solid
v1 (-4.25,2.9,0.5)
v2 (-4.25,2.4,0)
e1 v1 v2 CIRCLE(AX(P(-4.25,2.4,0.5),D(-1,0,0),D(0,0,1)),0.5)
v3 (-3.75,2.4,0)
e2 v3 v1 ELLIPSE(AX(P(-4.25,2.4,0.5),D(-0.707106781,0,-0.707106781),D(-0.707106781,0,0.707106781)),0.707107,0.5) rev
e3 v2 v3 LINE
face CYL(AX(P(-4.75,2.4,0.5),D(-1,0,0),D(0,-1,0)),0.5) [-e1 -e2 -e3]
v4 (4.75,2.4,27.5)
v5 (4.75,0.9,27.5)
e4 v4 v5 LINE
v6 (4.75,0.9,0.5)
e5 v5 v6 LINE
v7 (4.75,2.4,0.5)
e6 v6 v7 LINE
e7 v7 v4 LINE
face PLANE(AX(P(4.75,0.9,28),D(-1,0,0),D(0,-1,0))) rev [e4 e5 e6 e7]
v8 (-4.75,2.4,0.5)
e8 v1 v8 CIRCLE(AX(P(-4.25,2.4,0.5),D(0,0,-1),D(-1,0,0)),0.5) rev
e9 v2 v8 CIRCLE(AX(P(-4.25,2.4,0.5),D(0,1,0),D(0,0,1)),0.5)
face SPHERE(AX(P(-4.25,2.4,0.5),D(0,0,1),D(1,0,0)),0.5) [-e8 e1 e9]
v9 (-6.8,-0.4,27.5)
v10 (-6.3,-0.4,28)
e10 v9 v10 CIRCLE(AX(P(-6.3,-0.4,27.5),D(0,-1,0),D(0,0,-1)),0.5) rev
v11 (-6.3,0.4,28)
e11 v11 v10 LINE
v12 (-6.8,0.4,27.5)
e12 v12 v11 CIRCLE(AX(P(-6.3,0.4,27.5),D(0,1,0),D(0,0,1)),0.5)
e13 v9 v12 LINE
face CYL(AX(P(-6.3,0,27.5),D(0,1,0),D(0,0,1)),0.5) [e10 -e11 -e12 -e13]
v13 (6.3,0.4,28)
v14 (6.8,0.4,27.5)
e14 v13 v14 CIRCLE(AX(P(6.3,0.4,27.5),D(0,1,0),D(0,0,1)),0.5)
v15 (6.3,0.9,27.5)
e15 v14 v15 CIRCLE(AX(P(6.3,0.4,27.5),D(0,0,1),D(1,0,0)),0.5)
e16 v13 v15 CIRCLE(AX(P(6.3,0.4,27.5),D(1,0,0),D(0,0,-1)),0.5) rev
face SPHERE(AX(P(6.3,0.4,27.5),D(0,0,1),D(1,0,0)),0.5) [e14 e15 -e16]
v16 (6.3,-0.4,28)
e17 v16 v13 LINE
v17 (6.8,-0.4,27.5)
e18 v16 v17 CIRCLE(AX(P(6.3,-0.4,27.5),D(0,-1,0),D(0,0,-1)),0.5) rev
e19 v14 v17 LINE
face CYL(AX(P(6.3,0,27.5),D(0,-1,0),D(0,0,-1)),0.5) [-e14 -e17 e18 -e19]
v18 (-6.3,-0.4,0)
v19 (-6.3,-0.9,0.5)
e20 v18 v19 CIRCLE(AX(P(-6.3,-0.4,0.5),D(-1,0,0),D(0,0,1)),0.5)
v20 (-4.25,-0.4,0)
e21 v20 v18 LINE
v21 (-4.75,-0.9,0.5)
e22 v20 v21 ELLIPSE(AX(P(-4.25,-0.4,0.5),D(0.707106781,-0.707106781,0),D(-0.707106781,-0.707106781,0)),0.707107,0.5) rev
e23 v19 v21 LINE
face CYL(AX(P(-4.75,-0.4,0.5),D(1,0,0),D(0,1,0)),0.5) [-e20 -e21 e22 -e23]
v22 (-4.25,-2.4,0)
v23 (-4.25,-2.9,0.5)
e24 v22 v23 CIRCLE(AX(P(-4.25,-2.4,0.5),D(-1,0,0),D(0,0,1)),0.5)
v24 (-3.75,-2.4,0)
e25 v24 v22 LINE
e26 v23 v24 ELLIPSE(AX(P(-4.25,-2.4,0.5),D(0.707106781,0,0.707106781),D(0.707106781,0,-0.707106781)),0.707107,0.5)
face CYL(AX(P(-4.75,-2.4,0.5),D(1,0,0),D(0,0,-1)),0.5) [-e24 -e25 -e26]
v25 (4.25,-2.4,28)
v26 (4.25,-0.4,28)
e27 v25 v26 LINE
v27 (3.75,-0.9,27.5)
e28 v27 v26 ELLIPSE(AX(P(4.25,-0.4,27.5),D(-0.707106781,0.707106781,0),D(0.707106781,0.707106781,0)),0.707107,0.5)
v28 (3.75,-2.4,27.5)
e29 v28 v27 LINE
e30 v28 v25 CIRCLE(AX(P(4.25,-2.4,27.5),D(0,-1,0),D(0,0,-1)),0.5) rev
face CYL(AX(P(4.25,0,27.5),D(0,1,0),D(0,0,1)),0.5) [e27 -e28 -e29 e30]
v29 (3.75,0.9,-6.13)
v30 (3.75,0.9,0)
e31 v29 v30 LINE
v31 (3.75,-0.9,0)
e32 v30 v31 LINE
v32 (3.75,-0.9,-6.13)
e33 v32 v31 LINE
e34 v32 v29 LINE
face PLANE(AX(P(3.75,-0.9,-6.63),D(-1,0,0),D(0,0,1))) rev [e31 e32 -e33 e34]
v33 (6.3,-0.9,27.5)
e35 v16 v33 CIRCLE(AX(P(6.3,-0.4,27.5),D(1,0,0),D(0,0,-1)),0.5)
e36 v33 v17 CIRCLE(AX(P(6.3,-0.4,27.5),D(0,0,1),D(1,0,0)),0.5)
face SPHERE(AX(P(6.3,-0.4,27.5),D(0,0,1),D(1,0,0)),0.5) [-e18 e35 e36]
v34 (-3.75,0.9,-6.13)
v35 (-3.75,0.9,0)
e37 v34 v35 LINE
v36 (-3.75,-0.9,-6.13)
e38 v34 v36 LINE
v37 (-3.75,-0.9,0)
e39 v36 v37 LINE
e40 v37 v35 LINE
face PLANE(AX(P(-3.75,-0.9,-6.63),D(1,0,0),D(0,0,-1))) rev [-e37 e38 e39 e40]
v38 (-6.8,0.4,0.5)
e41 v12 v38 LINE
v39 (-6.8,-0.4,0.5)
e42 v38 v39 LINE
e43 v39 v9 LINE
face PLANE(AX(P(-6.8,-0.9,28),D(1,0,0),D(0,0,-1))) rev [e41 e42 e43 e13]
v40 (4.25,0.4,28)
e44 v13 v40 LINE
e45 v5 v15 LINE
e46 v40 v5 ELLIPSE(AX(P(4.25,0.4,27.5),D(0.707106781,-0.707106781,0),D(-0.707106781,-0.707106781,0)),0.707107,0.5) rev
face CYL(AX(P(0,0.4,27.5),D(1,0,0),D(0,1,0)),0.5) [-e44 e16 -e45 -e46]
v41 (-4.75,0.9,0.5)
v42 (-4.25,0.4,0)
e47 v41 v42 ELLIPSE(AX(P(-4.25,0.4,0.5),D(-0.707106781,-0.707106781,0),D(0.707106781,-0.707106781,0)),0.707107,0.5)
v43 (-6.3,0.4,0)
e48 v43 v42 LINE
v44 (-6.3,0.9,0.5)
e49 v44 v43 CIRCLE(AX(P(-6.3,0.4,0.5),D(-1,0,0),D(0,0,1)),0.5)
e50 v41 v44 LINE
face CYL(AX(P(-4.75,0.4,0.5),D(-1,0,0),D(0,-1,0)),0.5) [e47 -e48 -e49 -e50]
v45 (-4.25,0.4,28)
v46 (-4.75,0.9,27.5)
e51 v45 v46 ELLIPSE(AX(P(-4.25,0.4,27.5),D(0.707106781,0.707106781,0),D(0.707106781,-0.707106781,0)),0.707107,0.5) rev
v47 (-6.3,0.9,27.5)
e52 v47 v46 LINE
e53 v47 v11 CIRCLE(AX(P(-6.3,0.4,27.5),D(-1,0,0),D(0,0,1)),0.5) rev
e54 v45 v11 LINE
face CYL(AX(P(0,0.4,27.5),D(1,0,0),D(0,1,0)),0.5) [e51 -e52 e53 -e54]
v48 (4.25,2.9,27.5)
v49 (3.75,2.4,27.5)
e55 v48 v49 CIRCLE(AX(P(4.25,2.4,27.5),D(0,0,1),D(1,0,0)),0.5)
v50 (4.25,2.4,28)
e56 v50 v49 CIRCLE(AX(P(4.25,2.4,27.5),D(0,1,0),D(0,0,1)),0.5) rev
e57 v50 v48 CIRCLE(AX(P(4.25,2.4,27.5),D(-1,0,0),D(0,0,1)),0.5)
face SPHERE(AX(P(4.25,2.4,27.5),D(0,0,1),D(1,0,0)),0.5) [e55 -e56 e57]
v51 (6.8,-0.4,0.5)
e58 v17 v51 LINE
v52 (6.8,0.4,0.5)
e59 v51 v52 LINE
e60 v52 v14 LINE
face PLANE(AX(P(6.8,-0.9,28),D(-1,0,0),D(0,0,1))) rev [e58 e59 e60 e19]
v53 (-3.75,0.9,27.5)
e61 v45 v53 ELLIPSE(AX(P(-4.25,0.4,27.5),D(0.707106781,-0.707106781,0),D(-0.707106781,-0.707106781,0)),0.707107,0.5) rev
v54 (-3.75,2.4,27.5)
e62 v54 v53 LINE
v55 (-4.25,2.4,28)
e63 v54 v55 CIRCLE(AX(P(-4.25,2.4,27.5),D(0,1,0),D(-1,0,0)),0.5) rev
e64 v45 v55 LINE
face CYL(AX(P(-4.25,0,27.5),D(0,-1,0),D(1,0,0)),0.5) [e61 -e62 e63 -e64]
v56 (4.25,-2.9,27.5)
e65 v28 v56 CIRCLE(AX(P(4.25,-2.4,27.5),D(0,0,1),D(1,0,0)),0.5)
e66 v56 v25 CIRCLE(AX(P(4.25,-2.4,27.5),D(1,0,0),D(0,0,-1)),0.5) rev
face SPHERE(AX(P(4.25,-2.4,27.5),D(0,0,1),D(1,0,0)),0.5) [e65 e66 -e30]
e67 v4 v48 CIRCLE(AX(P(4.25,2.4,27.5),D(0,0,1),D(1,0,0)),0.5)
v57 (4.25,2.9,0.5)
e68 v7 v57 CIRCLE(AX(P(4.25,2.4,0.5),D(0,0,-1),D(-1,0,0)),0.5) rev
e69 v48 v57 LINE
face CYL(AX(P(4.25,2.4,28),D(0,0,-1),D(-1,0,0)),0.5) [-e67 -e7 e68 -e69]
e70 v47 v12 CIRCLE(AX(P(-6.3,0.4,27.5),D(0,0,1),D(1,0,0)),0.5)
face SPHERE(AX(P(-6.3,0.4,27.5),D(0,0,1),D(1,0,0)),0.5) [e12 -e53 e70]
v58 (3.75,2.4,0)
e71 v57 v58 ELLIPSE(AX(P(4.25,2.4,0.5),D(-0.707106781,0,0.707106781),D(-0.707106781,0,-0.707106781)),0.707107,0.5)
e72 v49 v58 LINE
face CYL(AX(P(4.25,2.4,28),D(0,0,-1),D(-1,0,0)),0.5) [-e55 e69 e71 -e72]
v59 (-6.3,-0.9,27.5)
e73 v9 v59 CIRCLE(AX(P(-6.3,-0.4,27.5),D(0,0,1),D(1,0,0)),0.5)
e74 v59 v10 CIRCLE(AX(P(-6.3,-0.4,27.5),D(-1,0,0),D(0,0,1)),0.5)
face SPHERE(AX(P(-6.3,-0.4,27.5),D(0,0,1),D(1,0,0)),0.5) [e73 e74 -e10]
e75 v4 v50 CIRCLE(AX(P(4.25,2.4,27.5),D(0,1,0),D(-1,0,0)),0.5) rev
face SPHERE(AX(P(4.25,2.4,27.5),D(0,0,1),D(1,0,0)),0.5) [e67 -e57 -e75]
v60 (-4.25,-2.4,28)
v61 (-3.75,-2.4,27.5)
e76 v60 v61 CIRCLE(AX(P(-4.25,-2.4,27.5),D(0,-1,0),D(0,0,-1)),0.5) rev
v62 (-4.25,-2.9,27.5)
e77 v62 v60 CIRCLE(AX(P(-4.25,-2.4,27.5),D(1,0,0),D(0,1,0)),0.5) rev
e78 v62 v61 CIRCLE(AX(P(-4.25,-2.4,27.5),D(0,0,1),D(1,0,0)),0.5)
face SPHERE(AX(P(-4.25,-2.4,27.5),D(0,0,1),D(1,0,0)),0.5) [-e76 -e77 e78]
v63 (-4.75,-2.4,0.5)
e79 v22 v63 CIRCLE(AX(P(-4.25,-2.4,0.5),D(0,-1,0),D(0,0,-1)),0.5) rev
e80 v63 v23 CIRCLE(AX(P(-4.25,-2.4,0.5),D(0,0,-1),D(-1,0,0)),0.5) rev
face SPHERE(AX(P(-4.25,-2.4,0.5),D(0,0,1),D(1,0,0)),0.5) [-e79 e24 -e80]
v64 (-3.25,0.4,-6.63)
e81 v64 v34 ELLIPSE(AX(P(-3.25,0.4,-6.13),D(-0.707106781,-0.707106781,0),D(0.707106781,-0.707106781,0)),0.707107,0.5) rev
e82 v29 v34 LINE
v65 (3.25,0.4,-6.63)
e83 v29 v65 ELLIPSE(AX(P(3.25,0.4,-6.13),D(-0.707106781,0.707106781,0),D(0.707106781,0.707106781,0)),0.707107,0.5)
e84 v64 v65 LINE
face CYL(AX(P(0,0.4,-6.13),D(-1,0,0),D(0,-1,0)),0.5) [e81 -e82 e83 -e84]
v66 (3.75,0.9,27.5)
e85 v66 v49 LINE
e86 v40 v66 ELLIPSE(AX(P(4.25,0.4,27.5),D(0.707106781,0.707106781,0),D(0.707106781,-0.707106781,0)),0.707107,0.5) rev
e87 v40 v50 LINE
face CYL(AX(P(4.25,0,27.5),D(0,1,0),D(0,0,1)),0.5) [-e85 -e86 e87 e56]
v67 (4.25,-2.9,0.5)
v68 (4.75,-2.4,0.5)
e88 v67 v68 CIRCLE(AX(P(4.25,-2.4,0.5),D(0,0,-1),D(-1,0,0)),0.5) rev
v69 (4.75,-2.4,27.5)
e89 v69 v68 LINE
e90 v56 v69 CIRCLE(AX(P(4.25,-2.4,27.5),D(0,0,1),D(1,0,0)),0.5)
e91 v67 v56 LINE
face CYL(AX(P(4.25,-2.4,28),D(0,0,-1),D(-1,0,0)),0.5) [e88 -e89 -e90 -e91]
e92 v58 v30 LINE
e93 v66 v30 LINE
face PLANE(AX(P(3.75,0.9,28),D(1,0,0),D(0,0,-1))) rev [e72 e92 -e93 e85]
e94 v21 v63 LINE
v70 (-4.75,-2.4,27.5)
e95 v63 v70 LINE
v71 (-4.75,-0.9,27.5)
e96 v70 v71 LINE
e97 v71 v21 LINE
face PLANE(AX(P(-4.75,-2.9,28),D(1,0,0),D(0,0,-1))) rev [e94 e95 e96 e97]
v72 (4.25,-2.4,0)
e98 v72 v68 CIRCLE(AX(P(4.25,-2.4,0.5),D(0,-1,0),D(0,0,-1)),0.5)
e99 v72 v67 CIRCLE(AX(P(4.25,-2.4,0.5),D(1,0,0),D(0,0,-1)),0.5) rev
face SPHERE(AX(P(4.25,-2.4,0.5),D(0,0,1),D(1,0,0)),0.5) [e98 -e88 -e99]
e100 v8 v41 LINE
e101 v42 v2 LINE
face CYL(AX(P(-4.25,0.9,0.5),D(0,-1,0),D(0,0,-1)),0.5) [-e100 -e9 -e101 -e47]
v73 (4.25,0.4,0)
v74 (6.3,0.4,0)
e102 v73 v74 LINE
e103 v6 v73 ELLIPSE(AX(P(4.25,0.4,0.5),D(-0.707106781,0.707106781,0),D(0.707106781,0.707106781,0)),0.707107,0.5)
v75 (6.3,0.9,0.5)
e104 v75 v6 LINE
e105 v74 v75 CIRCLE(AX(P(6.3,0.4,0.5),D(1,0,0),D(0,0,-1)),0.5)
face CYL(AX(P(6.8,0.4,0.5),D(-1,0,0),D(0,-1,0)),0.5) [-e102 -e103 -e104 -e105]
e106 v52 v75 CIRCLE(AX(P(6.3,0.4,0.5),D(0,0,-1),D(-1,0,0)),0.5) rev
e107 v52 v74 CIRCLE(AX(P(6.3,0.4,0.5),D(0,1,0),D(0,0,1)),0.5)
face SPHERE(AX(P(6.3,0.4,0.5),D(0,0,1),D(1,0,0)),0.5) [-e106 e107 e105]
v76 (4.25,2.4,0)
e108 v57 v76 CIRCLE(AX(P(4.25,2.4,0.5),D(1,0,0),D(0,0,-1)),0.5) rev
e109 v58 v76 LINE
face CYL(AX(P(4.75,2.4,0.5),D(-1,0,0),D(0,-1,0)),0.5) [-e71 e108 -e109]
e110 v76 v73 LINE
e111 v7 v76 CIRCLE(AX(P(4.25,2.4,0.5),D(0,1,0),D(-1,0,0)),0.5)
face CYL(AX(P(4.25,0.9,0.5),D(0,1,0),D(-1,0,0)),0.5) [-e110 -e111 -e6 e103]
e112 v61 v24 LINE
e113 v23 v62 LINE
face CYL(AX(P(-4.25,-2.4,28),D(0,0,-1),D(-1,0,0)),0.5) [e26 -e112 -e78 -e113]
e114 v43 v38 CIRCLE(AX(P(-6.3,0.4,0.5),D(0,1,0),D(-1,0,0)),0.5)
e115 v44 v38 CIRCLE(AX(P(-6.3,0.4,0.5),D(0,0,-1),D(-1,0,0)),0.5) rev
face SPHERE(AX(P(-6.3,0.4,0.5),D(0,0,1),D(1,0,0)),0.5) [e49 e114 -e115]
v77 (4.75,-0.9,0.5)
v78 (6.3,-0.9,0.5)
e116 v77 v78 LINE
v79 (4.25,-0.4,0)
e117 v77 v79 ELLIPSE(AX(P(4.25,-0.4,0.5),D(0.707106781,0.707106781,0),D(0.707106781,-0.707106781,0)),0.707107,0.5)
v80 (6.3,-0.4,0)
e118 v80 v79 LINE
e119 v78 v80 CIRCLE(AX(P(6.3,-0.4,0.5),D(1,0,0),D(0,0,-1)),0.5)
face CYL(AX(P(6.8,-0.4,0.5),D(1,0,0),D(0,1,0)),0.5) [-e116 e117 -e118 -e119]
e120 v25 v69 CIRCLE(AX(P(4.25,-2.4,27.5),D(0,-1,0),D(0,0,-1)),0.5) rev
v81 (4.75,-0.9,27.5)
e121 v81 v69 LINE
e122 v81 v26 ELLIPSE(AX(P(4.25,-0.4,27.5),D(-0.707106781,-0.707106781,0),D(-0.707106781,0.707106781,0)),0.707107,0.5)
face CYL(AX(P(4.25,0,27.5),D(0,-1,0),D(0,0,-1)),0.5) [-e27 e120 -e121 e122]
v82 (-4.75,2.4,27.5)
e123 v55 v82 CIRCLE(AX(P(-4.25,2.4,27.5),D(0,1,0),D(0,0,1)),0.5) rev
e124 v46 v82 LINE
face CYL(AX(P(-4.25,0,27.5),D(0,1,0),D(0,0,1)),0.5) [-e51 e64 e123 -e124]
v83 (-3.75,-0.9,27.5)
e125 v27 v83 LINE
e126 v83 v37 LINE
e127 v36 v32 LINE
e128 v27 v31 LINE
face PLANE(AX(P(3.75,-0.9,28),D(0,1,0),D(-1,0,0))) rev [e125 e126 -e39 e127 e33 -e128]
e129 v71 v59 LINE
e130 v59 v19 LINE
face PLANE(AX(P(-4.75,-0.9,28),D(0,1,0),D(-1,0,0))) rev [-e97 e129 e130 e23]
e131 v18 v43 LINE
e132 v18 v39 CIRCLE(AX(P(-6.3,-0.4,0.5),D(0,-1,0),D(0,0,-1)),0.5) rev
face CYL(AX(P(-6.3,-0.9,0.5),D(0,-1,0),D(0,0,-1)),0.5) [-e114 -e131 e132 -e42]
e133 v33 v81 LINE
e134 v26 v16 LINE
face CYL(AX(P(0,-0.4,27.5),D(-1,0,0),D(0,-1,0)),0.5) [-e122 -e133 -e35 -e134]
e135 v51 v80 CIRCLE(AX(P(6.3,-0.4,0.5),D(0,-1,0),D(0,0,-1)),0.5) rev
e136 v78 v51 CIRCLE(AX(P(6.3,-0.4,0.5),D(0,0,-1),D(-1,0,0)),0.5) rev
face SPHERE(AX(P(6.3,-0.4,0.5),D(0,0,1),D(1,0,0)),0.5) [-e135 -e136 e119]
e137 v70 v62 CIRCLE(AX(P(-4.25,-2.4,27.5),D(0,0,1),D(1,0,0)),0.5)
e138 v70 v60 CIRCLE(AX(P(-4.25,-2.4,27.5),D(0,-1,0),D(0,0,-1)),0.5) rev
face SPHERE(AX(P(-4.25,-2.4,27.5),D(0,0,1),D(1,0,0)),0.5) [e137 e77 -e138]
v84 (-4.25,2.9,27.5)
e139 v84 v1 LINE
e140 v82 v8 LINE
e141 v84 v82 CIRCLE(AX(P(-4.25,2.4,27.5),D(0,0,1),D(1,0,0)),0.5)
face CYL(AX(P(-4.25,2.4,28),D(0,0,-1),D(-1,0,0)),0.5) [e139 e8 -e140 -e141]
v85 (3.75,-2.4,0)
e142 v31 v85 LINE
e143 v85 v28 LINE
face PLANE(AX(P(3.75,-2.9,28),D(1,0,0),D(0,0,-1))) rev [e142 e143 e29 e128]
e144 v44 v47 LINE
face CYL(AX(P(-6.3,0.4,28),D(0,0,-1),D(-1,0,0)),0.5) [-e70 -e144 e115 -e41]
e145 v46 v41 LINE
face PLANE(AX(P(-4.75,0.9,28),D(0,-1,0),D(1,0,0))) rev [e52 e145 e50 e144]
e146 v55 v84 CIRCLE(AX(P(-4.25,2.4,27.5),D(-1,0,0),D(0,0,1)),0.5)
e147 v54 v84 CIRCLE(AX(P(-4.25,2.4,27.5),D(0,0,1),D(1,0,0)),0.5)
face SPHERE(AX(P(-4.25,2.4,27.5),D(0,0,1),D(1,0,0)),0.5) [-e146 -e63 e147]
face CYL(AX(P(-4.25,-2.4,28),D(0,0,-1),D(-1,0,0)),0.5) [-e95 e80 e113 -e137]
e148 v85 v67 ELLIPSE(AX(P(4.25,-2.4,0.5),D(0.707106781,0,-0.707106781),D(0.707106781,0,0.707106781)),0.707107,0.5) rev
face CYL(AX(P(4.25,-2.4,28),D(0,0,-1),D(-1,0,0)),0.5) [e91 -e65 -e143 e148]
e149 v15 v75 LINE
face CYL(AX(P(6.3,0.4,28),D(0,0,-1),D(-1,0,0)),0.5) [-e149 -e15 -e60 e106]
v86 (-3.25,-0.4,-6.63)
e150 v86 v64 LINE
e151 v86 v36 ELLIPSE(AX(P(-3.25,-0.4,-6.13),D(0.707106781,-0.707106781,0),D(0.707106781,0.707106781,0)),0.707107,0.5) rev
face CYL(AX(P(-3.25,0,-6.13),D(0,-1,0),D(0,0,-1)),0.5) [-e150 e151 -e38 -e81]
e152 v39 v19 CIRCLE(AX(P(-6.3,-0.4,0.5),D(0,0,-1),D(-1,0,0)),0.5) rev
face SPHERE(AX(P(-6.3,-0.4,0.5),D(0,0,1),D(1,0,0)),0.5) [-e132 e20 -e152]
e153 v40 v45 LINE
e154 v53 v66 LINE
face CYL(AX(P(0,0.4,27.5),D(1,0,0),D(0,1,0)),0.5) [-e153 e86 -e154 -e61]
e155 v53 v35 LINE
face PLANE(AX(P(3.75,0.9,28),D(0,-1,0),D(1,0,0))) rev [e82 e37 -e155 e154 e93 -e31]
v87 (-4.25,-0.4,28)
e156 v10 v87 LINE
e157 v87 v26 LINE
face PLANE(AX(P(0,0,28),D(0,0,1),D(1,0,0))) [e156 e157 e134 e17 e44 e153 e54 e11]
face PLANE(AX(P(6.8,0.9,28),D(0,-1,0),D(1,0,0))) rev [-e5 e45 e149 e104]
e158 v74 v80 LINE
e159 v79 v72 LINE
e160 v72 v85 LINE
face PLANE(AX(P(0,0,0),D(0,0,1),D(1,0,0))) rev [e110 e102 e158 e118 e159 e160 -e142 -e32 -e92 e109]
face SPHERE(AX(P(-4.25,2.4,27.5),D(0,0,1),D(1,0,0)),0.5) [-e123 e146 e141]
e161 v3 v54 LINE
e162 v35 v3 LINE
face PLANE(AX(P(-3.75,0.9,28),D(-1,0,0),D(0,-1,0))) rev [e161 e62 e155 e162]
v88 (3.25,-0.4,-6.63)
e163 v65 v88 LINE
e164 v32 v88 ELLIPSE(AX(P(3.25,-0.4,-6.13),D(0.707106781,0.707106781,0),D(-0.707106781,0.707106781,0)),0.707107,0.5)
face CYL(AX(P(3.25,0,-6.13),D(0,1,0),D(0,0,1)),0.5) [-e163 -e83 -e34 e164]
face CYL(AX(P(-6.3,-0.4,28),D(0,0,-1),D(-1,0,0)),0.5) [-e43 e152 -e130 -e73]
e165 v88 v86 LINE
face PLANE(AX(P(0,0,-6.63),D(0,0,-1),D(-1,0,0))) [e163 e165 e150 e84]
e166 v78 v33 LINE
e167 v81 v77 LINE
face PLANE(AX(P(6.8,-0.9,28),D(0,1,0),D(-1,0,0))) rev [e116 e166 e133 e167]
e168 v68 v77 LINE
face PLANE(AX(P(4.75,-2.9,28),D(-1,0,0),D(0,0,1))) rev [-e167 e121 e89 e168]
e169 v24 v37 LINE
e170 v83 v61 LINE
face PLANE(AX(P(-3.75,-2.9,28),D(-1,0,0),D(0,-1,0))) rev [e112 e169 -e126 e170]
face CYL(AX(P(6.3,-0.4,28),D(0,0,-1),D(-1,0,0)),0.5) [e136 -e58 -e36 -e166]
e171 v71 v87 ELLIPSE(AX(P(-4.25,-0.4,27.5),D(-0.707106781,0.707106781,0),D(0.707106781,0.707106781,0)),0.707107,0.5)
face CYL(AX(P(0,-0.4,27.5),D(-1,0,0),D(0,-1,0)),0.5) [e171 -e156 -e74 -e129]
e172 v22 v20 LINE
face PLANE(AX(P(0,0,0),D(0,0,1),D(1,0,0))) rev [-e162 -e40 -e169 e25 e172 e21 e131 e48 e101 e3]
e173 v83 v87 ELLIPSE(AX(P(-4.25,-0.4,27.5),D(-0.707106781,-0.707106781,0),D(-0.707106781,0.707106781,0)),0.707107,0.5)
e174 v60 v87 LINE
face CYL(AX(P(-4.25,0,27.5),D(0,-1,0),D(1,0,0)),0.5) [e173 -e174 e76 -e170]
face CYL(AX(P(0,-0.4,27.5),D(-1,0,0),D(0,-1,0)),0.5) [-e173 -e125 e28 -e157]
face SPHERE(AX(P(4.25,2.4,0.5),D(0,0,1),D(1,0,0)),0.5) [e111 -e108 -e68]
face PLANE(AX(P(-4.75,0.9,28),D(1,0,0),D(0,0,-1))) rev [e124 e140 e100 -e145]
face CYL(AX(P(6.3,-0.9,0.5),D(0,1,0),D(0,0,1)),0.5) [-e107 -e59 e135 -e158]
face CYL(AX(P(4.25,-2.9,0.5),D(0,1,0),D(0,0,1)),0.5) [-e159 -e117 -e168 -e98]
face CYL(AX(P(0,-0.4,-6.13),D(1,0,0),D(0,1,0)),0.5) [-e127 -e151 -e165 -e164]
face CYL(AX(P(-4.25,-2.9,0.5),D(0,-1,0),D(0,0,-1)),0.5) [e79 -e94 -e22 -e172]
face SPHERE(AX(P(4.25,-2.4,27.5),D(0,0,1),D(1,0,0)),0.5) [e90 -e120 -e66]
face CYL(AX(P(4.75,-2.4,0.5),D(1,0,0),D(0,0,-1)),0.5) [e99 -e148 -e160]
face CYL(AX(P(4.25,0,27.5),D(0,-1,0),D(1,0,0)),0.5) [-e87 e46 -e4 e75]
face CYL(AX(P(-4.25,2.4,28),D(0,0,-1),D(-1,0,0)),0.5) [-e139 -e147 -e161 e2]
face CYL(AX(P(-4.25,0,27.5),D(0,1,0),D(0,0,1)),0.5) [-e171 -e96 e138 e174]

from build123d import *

# Parameters (mm, degrees)
AUFSATZ_LINEAR_AUSTRAGEN1_DEPTH = 28
SKIZZE2_W                       = 7.5
SKIZZE2_H                       = 1.8
AUFSATZ_LINEAR_AUSTRAGEN2_DEPTH = 6.63
VERRUNDUNG1_R                   = 0.5


with BuildPart() as part:
    # Skizze1 → Aufsatz-Linear austragen1 (new body)
    with BuildSketch(Plane.XY):
        Polygon((-4.75, 0.9), (-6.8, 0.9), (-6.8, -0.9), (-4.75, -0.9), (-4.75, -2.9), (-3.75, -2.9), (-3.75, -0.9), (3.75, -0.9), (3.75, -2.9), (4.75, -2.9), (4.75, -0.9), (6.8, -0.9), (6.8, 0.9), (4.75, 0.9), (4.75, 2.9), (3.75, 2.9), (3.75, 0.9), (-3.75, 0.9), (-3.75, 2.9), (-4.75, 2.9), align=None)
    extrude(amount=AUFSATZ_LINEAR_AUSTRAGEN1_DEPTH)

    # Skizze2 → Aufsatz-Linear austragen2 (add)
    with BuildSketch(Plane(origin=(0, 0, 0), x_dir=(-1, 0, 0), z_dir=(0, 0, -1))):
        Rectangle(SKIZZE2_W, SKIZZE2_H)
    extrude(amount=AUFSATZ_LINEAR_AUSTRAGEN2_DEPTH)

    # Verrundung1
    verrundung1_edges = [part.edges().sort_by_distance(p)[0] for p in [
        (-4.75, -1.9, 28),
        (-4.25, -2.9, 28),
        (-5.775, 0.9, 0),
        (-4.75, 1.9, 0),
        (-4.25, 2.9, 0),
        (-3.75, -1.9, 28),
        (4.25, 2.9, 0),
        (4.75, 1.9, 0),
        (5.775, 0.9, 0),
        (6.8, 0, 0),
        (5.775, -0.9, 0),
        (4.75, -1.9, 0),
        (4.25, -2.9, 0),
        (0, -0.9, 28),
        (-4.25, -2.9, 0),
        (-4.75, -1.9, 0),
        (-5.775, -0.9, 0),
        (-6.8, 0, 0),
        (3.75, -1.9, 28),
        (4.25, -2.9, 28),
        (-6.8, 0.9, 14),
        (-4.75, 2.9, 14),
        (-3.75, 2.9, 14),
        (3.75, 2.9, 14),
        (4.75, 2.9, 14),
        (6.8, 0.9, 14),
        (6.8, -0.9, 14),
        (4.75, -2.9, 14),
        (3.75, -2.9, 14),
        (-3.75, -2.9, 14),
        (-4.75, -2.9, 14),
        (-6.8, -0.9, 14),
        (4.75, -1.9, 28),
        (5.775, -0.9, 28),
        (6.8, 0, 28),
        (5.775, 0.9, 28),
        (-6.8, 0, 28),
        (4.75, 1.9, 28),
        (4.25, 2.9, 28),
        (3.75, 0, -6.63),
        (0, -0.9, -6.63),
        (-3.75, 0, -6.63),
        (0, 0.9, -6.63),
        (3.75, 1.9, 28),
        (0, 0.9, 28),
        (-3.75, 1.9, 28),
        (-4.25, 2.9, 28),
        (-4.75, 1.9, 28),
        (-5.775, 0.9, 28),
        (-5.775, -0.9, 28),
    ]]
    fillet(verrundung1_edges, radius=VERRUNDUNG1_R - 0.0001)  # a hair under: the kernel refuses the full size


solid = part.part
